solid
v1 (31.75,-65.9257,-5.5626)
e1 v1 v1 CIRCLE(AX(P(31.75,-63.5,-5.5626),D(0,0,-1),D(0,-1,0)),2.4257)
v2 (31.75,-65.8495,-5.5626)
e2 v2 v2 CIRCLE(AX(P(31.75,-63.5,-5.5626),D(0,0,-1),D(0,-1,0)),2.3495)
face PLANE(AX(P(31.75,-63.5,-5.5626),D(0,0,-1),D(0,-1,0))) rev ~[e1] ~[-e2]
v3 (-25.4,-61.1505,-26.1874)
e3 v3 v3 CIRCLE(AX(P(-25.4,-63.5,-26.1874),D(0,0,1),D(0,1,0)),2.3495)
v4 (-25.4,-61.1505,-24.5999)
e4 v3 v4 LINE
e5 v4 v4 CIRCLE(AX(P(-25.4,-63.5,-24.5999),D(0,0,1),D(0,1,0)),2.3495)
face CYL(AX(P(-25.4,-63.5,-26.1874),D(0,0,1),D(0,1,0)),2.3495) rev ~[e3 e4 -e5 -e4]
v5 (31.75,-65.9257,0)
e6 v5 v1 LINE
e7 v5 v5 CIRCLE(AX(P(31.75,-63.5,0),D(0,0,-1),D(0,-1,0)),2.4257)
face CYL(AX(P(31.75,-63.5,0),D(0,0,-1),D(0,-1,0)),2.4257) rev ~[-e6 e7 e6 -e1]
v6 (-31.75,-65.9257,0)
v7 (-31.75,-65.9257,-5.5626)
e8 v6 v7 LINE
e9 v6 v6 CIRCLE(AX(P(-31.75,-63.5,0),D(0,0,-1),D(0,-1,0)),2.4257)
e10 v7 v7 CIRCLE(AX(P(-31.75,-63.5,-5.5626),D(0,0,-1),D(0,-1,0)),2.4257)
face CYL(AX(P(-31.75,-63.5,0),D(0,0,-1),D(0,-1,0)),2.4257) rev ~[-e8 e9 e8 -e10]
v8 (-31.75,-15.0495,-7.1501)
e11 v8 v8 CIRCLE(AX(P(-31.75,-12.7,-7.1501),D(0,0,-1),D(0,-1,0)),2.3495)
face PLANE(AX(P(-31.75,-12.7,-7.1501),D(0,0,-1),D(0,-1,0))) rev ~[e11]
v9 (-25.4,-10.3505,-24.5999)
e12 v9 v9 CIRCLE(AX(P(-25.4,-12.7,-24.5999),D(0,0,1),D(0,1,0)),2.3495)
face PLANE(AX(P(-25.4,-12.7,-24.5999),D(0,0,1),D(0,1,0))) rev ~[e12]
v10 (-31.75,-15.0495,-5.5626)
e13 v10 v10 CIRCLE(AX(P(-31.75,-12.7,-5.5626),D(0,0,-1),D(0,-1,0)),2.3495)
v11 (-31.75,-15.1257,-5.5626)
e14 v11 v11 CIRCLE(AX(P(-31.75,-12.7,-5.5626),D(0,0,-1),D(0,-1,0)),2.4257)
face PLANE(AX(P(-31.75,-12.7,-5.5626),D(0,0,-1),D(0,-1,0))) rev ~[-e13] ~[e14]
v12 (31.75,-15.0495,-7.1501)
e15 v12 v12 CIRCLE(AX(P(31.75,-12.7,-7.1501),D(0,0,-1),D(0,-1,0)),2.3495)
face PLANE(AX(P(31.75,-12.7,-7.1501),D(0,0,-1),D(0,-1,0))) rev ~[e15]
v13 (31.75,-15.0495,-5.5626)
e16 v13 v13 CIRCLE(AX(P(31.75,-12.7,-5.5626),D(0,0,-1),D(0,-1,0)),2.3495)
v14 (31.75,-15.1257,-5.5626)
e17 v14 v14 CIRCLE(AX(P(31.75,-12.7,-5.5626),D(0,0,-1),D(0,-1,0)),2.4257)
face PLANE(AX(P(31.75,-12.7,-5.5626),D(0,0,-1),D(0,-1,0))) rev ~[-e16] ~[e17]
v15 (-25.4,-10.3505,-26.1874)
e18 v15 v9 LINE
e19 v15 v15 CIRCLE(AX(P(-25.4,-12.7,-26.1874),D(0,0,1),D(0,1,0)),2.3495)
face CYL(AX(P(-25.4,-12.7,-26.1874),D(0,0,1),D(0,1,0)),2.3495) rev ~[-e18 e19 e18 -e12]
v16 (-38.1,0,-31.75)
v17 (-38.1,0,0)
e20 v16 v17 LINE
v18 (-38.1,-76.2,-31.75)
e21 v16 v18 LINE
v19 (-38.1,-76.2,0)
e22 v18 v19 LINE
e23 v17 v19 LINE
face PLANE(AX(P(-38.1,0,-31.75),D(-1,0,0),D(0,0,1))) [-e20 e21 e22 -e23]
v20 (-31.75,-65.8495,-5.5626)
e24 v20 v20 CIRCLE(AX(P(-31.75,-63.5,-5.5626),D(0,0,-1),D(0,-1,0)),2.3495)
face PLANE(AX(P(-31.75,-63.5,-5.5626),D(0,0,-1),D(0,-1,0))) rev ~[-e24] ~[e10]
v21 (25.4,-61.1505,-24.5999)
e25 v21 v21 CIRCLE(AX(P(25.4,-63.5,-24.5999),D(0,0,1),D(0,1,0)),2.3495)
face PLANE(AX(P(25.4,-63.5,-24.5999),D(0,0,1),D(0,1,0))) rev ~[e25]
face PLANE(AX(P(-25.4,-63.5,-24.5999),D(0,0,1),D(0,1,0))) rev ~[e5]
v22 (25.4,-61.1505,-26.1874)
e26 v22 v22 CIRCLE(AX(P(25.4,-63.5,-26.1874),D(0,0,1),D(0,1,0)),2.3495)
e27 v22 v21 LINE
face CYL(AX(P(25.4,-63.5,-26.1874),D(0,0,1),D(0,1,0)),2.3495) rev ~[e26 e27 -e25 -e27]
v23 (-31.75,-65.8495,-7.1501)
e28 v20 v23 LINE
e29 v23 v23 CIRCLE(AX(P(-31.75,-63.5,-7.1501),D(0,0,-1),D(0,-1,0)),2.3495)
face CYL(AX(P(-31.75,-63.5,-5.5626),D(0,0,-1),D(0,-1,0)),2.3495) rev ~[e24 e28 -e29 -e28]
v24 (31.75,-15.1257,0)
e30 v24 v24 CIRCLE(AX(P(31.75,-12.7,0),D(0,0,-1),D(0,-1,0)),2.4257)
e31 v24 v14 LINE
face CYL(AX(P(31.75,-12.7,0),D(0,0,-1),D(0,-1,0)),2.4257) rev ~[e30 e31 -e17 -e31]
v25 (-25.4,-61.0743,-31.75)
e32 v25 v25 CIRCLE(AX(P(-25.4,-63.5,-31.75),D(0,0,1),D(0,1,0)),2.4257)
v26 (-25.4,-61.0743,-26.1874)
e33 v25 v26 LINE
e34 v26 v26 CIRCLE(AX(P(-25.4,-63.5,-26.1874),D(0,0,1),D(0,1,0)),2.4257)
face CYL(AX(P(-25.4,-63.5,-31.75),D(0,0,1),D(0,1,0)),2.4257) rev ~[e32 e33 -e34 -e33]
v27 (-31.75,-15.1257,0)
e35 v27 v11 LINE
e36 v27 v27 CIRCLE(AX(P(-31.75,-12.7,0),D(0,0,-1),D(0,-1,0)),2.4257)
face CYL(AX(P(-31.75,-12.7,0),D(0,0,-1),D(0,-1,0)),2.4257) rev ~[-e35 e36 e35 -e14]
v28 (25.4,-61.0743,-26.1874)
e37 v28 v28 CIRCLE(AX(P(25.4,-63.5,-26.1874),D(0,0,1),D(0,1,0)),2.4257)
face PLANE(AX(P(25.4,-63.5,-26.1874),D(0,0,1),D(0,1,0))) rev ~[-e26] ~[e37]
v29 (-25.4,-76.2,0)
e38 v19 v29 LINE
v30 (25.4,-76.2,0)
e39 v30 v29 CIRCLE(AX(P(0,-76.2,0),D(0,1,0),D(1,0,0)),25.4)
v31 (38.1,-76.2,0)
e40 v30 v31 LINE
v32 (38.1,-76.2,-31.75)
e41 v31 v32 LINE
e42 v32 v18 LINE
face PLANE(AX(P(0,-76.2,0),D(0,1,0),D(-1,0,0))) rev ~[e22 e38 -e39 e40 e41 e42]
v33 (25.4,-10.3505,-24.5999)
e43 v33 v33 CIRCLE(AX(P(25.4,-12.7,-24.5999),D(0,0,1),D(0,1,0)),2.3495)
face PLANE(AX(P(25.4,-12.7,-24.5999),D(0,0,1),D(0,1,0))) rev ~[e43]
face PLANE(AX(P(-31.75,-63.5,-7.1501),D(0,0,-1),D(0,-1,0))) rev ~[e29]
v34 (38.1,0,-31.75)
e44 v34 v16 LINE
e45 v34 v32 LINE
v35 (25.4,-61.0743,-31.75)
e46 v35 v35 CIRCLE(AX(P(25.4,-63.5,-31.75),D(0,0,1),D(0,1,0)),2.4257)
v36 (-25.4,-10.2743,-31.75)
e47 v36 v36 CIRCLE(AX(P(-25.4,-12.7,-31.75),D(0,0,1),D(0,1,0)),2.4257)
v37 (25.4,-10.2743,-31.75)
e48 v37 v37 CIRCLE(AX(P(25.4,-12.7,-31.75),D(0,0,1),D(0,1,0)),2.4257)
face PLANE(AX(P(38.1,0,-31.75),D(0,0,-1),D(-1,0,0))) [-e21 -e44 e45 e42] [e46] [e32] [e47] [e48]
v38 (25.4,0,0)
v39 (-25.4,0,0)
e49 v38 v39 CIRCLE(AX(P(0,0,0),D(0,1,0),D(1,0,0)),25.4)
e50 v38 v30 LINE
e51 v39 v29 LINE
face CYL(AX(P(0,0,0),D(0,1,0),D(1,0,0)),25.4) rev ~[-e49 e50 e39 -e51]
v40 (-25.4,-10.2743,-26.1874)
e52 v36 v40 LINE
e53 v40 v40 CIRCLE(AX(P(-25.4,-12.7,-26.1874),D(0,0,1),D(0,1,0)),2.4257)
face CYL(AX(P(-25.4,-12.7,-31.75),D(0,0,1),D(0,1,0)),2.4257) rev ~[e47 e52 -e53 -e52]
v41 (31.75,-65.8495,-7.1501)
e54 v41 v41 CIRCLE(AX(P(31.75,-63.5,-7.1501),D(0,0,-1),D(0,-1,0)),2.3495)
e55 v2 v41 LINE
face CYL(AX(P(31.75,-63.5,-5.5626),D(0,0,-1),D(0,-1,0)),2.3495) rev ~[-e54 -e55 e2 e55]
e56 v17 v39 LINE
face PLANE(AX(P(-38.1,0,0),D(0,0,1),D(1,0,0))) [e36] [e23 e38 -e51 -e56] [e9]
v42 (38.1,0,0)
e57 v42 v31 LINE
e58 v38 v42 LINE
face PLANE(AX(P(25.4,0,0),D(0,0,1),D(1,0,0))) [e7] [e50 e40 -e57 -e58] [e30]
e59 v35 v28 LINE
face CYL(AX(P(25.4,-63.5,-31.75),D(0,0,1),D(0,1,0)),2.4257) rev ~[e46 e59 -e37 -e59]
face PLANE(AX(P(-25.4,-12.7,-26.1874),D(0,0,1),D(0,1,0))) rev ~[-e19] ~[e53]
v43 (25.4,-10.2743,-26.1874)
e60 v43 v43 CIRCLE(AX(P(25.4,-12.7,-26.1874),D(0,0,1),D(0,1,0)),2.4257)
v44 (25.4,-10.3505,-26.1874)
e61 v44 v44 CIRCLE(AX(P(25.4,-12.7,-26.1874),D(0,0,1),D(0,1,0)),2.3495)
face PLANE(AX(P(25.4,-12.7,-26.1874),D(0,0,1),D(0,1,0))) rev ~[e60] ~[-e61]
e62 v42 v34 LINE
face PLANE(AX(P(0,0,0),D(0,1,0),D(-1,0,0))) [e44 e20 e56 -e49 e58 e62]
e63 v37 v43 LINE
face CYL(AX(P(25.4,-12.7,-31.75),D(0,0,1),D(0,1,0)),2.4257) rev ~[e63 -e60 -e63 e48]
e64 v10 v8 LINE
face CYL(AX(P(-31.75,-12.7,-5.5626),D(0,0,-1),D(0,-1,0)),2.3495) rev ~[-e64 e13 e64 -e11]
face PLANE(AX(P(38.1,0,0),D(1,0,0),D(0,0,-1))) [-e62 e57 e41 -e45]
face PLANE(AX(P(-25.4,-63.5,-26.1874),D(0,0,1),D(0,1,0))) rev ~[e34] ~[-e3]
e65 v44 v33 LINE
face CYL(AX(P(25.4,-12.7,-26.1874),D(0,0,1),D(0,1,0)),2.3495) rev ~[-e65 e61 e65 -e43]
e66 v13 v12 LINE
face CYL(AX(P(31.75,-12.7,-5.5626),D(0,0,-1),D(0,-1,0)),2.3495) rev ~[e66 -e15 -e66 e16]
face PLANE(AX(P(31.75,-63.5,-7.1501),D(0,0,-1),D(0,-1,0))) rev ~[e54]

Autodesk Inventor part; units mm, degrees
ref_plane "YZ Plane" through (0, 0, 0) normal (1, 0, 0) x (0, 1, 0)
ref_plane "XZ Plane" through (0, 0, 0) normal (0, 1, 0) x (-1, 0, 0)
ref_plane "XY Plane" through (0, 0, 0) normal (0, 0, 1) x (1, 0, 0)
sketch "Sketch18" plane through (0, 0, 0) normal (0, 1, 0) x (-1, 0, 0)
  arc A0 (-25.4, 0) -> (25.4, 0) centre (0, 0) ccw
  line L0 (-38.1, 0) -> (-38.1, -31.75)
  line L1 (-38.1, -31.75) -> (38.1, -31.75)
  line L2 (38.1, -31.75) -> (38.1, 0)
  line L3 (38.1, 31.75) -> (-38.1, -31.75) construction
  line L4 (-38.1, 31.75) -> (38.1, -31.75) construction
  line L5 (38.1, 0) -> (25.4, 0)
  line L6 (-25.4, 0) -> (-38.1, 0)
  dimension "d78" = 50.8
  dimension "d79" = 6.35
  dimension "d80" = 12.7
extrude "Extrusion9" add sketch "Sketch18" against normal blind 76.2
sketch "Sketch19" plane through (-38.1, 0, 0) normal (0, 0, 1) x (1, 0, 0)
  line L0 (0, 0) -> (0, -76.2) projected
  line L1 (12.7, 0) -> (12.7, -76.2) projected
  line L2 (63.5, 0) -> (63.5, -76.2) projected
  line L3 (76.2, 0) -> (76.2, -76.2) projected
  line L4 (76.2, -76.2) -> (63.5, -76.2) projected
  line L5 (12.7, -76.2) -> (0, -76.2) projected
  line L6 (0, 0) -> (12.7, 0) projected
  line L7 (63.5, 0) -> (76.2, 0) projected
  line L8 (6.35, -63.5) -> (69.85, -63.5) construction
  line L9 (69.85, -63.5) -> (69.85, -12.7) construction
  line L10 (69.85, -12.7) -> (6.35, -12.7) construction
  line L11 (6.35, -12.7) -> (6.35, -63.5) construction
  line L12 (63.5, -76.2) -> (12.7, -76.2) construction
  line L13 (12.7, 0) -> (63.5, 0) construction
  point P0 (38.1, 0)
  dimension "d83" = 6.35
  dimension "d84" = 6.35
  dimension "d85" = 12.7
  dimension "d86" = 12.7
hole "Hole3" at (-31.75, -12.7, 0) at (31.75, -12.7, 0) at (31.75, -63.5, 0) at (-31.75, -63.5, 0) direction (0, 0, -1) diameter 4.699 depth 7.1501 counterbore diameter 4.8514 counterbore depth 5.5626
sketch "Sketch20" plane through (38.1, 0, -31.75) normal (0, 0, -1) x (-1, 0, 0)
  line L0 (76.2, 0) -> (76.2, -76.2) projected
  line L1 (0, 0) -> (76.2, 0) projected
  line L2 (0, 0) -> (0, -76.2) projected
  line L3 (76.2, -76.2) -> (0, -76.2) projected
  line L4 (12.7, -63.5) -> (63.5, -63.5) construction
  line L5 (63.5, -63.5) -> (63.5, -12.7) construction
  line L6 (63.5, -12.7) -> (12.7, -12.7) construction
  line L7 (12.7, -12.7) -> (12.7, -63.5) construction
  line L8 (12.7, -63.5) -> (63.5, -12.7) construction
  line L9 (63.5, -63.5) -> (12.7, -12.7) construction
  line L10 (0, 0) -> (0, -76.2) construction
  point P0 (38.1, 0)
  point P1 (38.1, -38.1)
  dimension "d94" = 12.7
  dimension "d95" = 12.7
  dimension "d96" = 12.7
  dimension "d97" = 12.7
hole "Hole4" at (25.4, -12.7, -31.75) at (-25.4, -12.7, -31.75) at (-25.4, -63.5, -31.75) at (25.4, -63.5, -31.75) direction (0, 0, 1) diameter 4.699 depth 7.1501 counterbore diameter 4.8514 counterbore depth 5.5626
equation "\"d78\" = legDiameter"
equation "\"d81\" = legPartHeight"
equation "\"legDiameter\" = 50.8"
equation "\"legWalThickness\" = 3.175"
equation "\"legPartHeight\" = 76.2"
properties part number "clampForMeadeTripodLeg"
